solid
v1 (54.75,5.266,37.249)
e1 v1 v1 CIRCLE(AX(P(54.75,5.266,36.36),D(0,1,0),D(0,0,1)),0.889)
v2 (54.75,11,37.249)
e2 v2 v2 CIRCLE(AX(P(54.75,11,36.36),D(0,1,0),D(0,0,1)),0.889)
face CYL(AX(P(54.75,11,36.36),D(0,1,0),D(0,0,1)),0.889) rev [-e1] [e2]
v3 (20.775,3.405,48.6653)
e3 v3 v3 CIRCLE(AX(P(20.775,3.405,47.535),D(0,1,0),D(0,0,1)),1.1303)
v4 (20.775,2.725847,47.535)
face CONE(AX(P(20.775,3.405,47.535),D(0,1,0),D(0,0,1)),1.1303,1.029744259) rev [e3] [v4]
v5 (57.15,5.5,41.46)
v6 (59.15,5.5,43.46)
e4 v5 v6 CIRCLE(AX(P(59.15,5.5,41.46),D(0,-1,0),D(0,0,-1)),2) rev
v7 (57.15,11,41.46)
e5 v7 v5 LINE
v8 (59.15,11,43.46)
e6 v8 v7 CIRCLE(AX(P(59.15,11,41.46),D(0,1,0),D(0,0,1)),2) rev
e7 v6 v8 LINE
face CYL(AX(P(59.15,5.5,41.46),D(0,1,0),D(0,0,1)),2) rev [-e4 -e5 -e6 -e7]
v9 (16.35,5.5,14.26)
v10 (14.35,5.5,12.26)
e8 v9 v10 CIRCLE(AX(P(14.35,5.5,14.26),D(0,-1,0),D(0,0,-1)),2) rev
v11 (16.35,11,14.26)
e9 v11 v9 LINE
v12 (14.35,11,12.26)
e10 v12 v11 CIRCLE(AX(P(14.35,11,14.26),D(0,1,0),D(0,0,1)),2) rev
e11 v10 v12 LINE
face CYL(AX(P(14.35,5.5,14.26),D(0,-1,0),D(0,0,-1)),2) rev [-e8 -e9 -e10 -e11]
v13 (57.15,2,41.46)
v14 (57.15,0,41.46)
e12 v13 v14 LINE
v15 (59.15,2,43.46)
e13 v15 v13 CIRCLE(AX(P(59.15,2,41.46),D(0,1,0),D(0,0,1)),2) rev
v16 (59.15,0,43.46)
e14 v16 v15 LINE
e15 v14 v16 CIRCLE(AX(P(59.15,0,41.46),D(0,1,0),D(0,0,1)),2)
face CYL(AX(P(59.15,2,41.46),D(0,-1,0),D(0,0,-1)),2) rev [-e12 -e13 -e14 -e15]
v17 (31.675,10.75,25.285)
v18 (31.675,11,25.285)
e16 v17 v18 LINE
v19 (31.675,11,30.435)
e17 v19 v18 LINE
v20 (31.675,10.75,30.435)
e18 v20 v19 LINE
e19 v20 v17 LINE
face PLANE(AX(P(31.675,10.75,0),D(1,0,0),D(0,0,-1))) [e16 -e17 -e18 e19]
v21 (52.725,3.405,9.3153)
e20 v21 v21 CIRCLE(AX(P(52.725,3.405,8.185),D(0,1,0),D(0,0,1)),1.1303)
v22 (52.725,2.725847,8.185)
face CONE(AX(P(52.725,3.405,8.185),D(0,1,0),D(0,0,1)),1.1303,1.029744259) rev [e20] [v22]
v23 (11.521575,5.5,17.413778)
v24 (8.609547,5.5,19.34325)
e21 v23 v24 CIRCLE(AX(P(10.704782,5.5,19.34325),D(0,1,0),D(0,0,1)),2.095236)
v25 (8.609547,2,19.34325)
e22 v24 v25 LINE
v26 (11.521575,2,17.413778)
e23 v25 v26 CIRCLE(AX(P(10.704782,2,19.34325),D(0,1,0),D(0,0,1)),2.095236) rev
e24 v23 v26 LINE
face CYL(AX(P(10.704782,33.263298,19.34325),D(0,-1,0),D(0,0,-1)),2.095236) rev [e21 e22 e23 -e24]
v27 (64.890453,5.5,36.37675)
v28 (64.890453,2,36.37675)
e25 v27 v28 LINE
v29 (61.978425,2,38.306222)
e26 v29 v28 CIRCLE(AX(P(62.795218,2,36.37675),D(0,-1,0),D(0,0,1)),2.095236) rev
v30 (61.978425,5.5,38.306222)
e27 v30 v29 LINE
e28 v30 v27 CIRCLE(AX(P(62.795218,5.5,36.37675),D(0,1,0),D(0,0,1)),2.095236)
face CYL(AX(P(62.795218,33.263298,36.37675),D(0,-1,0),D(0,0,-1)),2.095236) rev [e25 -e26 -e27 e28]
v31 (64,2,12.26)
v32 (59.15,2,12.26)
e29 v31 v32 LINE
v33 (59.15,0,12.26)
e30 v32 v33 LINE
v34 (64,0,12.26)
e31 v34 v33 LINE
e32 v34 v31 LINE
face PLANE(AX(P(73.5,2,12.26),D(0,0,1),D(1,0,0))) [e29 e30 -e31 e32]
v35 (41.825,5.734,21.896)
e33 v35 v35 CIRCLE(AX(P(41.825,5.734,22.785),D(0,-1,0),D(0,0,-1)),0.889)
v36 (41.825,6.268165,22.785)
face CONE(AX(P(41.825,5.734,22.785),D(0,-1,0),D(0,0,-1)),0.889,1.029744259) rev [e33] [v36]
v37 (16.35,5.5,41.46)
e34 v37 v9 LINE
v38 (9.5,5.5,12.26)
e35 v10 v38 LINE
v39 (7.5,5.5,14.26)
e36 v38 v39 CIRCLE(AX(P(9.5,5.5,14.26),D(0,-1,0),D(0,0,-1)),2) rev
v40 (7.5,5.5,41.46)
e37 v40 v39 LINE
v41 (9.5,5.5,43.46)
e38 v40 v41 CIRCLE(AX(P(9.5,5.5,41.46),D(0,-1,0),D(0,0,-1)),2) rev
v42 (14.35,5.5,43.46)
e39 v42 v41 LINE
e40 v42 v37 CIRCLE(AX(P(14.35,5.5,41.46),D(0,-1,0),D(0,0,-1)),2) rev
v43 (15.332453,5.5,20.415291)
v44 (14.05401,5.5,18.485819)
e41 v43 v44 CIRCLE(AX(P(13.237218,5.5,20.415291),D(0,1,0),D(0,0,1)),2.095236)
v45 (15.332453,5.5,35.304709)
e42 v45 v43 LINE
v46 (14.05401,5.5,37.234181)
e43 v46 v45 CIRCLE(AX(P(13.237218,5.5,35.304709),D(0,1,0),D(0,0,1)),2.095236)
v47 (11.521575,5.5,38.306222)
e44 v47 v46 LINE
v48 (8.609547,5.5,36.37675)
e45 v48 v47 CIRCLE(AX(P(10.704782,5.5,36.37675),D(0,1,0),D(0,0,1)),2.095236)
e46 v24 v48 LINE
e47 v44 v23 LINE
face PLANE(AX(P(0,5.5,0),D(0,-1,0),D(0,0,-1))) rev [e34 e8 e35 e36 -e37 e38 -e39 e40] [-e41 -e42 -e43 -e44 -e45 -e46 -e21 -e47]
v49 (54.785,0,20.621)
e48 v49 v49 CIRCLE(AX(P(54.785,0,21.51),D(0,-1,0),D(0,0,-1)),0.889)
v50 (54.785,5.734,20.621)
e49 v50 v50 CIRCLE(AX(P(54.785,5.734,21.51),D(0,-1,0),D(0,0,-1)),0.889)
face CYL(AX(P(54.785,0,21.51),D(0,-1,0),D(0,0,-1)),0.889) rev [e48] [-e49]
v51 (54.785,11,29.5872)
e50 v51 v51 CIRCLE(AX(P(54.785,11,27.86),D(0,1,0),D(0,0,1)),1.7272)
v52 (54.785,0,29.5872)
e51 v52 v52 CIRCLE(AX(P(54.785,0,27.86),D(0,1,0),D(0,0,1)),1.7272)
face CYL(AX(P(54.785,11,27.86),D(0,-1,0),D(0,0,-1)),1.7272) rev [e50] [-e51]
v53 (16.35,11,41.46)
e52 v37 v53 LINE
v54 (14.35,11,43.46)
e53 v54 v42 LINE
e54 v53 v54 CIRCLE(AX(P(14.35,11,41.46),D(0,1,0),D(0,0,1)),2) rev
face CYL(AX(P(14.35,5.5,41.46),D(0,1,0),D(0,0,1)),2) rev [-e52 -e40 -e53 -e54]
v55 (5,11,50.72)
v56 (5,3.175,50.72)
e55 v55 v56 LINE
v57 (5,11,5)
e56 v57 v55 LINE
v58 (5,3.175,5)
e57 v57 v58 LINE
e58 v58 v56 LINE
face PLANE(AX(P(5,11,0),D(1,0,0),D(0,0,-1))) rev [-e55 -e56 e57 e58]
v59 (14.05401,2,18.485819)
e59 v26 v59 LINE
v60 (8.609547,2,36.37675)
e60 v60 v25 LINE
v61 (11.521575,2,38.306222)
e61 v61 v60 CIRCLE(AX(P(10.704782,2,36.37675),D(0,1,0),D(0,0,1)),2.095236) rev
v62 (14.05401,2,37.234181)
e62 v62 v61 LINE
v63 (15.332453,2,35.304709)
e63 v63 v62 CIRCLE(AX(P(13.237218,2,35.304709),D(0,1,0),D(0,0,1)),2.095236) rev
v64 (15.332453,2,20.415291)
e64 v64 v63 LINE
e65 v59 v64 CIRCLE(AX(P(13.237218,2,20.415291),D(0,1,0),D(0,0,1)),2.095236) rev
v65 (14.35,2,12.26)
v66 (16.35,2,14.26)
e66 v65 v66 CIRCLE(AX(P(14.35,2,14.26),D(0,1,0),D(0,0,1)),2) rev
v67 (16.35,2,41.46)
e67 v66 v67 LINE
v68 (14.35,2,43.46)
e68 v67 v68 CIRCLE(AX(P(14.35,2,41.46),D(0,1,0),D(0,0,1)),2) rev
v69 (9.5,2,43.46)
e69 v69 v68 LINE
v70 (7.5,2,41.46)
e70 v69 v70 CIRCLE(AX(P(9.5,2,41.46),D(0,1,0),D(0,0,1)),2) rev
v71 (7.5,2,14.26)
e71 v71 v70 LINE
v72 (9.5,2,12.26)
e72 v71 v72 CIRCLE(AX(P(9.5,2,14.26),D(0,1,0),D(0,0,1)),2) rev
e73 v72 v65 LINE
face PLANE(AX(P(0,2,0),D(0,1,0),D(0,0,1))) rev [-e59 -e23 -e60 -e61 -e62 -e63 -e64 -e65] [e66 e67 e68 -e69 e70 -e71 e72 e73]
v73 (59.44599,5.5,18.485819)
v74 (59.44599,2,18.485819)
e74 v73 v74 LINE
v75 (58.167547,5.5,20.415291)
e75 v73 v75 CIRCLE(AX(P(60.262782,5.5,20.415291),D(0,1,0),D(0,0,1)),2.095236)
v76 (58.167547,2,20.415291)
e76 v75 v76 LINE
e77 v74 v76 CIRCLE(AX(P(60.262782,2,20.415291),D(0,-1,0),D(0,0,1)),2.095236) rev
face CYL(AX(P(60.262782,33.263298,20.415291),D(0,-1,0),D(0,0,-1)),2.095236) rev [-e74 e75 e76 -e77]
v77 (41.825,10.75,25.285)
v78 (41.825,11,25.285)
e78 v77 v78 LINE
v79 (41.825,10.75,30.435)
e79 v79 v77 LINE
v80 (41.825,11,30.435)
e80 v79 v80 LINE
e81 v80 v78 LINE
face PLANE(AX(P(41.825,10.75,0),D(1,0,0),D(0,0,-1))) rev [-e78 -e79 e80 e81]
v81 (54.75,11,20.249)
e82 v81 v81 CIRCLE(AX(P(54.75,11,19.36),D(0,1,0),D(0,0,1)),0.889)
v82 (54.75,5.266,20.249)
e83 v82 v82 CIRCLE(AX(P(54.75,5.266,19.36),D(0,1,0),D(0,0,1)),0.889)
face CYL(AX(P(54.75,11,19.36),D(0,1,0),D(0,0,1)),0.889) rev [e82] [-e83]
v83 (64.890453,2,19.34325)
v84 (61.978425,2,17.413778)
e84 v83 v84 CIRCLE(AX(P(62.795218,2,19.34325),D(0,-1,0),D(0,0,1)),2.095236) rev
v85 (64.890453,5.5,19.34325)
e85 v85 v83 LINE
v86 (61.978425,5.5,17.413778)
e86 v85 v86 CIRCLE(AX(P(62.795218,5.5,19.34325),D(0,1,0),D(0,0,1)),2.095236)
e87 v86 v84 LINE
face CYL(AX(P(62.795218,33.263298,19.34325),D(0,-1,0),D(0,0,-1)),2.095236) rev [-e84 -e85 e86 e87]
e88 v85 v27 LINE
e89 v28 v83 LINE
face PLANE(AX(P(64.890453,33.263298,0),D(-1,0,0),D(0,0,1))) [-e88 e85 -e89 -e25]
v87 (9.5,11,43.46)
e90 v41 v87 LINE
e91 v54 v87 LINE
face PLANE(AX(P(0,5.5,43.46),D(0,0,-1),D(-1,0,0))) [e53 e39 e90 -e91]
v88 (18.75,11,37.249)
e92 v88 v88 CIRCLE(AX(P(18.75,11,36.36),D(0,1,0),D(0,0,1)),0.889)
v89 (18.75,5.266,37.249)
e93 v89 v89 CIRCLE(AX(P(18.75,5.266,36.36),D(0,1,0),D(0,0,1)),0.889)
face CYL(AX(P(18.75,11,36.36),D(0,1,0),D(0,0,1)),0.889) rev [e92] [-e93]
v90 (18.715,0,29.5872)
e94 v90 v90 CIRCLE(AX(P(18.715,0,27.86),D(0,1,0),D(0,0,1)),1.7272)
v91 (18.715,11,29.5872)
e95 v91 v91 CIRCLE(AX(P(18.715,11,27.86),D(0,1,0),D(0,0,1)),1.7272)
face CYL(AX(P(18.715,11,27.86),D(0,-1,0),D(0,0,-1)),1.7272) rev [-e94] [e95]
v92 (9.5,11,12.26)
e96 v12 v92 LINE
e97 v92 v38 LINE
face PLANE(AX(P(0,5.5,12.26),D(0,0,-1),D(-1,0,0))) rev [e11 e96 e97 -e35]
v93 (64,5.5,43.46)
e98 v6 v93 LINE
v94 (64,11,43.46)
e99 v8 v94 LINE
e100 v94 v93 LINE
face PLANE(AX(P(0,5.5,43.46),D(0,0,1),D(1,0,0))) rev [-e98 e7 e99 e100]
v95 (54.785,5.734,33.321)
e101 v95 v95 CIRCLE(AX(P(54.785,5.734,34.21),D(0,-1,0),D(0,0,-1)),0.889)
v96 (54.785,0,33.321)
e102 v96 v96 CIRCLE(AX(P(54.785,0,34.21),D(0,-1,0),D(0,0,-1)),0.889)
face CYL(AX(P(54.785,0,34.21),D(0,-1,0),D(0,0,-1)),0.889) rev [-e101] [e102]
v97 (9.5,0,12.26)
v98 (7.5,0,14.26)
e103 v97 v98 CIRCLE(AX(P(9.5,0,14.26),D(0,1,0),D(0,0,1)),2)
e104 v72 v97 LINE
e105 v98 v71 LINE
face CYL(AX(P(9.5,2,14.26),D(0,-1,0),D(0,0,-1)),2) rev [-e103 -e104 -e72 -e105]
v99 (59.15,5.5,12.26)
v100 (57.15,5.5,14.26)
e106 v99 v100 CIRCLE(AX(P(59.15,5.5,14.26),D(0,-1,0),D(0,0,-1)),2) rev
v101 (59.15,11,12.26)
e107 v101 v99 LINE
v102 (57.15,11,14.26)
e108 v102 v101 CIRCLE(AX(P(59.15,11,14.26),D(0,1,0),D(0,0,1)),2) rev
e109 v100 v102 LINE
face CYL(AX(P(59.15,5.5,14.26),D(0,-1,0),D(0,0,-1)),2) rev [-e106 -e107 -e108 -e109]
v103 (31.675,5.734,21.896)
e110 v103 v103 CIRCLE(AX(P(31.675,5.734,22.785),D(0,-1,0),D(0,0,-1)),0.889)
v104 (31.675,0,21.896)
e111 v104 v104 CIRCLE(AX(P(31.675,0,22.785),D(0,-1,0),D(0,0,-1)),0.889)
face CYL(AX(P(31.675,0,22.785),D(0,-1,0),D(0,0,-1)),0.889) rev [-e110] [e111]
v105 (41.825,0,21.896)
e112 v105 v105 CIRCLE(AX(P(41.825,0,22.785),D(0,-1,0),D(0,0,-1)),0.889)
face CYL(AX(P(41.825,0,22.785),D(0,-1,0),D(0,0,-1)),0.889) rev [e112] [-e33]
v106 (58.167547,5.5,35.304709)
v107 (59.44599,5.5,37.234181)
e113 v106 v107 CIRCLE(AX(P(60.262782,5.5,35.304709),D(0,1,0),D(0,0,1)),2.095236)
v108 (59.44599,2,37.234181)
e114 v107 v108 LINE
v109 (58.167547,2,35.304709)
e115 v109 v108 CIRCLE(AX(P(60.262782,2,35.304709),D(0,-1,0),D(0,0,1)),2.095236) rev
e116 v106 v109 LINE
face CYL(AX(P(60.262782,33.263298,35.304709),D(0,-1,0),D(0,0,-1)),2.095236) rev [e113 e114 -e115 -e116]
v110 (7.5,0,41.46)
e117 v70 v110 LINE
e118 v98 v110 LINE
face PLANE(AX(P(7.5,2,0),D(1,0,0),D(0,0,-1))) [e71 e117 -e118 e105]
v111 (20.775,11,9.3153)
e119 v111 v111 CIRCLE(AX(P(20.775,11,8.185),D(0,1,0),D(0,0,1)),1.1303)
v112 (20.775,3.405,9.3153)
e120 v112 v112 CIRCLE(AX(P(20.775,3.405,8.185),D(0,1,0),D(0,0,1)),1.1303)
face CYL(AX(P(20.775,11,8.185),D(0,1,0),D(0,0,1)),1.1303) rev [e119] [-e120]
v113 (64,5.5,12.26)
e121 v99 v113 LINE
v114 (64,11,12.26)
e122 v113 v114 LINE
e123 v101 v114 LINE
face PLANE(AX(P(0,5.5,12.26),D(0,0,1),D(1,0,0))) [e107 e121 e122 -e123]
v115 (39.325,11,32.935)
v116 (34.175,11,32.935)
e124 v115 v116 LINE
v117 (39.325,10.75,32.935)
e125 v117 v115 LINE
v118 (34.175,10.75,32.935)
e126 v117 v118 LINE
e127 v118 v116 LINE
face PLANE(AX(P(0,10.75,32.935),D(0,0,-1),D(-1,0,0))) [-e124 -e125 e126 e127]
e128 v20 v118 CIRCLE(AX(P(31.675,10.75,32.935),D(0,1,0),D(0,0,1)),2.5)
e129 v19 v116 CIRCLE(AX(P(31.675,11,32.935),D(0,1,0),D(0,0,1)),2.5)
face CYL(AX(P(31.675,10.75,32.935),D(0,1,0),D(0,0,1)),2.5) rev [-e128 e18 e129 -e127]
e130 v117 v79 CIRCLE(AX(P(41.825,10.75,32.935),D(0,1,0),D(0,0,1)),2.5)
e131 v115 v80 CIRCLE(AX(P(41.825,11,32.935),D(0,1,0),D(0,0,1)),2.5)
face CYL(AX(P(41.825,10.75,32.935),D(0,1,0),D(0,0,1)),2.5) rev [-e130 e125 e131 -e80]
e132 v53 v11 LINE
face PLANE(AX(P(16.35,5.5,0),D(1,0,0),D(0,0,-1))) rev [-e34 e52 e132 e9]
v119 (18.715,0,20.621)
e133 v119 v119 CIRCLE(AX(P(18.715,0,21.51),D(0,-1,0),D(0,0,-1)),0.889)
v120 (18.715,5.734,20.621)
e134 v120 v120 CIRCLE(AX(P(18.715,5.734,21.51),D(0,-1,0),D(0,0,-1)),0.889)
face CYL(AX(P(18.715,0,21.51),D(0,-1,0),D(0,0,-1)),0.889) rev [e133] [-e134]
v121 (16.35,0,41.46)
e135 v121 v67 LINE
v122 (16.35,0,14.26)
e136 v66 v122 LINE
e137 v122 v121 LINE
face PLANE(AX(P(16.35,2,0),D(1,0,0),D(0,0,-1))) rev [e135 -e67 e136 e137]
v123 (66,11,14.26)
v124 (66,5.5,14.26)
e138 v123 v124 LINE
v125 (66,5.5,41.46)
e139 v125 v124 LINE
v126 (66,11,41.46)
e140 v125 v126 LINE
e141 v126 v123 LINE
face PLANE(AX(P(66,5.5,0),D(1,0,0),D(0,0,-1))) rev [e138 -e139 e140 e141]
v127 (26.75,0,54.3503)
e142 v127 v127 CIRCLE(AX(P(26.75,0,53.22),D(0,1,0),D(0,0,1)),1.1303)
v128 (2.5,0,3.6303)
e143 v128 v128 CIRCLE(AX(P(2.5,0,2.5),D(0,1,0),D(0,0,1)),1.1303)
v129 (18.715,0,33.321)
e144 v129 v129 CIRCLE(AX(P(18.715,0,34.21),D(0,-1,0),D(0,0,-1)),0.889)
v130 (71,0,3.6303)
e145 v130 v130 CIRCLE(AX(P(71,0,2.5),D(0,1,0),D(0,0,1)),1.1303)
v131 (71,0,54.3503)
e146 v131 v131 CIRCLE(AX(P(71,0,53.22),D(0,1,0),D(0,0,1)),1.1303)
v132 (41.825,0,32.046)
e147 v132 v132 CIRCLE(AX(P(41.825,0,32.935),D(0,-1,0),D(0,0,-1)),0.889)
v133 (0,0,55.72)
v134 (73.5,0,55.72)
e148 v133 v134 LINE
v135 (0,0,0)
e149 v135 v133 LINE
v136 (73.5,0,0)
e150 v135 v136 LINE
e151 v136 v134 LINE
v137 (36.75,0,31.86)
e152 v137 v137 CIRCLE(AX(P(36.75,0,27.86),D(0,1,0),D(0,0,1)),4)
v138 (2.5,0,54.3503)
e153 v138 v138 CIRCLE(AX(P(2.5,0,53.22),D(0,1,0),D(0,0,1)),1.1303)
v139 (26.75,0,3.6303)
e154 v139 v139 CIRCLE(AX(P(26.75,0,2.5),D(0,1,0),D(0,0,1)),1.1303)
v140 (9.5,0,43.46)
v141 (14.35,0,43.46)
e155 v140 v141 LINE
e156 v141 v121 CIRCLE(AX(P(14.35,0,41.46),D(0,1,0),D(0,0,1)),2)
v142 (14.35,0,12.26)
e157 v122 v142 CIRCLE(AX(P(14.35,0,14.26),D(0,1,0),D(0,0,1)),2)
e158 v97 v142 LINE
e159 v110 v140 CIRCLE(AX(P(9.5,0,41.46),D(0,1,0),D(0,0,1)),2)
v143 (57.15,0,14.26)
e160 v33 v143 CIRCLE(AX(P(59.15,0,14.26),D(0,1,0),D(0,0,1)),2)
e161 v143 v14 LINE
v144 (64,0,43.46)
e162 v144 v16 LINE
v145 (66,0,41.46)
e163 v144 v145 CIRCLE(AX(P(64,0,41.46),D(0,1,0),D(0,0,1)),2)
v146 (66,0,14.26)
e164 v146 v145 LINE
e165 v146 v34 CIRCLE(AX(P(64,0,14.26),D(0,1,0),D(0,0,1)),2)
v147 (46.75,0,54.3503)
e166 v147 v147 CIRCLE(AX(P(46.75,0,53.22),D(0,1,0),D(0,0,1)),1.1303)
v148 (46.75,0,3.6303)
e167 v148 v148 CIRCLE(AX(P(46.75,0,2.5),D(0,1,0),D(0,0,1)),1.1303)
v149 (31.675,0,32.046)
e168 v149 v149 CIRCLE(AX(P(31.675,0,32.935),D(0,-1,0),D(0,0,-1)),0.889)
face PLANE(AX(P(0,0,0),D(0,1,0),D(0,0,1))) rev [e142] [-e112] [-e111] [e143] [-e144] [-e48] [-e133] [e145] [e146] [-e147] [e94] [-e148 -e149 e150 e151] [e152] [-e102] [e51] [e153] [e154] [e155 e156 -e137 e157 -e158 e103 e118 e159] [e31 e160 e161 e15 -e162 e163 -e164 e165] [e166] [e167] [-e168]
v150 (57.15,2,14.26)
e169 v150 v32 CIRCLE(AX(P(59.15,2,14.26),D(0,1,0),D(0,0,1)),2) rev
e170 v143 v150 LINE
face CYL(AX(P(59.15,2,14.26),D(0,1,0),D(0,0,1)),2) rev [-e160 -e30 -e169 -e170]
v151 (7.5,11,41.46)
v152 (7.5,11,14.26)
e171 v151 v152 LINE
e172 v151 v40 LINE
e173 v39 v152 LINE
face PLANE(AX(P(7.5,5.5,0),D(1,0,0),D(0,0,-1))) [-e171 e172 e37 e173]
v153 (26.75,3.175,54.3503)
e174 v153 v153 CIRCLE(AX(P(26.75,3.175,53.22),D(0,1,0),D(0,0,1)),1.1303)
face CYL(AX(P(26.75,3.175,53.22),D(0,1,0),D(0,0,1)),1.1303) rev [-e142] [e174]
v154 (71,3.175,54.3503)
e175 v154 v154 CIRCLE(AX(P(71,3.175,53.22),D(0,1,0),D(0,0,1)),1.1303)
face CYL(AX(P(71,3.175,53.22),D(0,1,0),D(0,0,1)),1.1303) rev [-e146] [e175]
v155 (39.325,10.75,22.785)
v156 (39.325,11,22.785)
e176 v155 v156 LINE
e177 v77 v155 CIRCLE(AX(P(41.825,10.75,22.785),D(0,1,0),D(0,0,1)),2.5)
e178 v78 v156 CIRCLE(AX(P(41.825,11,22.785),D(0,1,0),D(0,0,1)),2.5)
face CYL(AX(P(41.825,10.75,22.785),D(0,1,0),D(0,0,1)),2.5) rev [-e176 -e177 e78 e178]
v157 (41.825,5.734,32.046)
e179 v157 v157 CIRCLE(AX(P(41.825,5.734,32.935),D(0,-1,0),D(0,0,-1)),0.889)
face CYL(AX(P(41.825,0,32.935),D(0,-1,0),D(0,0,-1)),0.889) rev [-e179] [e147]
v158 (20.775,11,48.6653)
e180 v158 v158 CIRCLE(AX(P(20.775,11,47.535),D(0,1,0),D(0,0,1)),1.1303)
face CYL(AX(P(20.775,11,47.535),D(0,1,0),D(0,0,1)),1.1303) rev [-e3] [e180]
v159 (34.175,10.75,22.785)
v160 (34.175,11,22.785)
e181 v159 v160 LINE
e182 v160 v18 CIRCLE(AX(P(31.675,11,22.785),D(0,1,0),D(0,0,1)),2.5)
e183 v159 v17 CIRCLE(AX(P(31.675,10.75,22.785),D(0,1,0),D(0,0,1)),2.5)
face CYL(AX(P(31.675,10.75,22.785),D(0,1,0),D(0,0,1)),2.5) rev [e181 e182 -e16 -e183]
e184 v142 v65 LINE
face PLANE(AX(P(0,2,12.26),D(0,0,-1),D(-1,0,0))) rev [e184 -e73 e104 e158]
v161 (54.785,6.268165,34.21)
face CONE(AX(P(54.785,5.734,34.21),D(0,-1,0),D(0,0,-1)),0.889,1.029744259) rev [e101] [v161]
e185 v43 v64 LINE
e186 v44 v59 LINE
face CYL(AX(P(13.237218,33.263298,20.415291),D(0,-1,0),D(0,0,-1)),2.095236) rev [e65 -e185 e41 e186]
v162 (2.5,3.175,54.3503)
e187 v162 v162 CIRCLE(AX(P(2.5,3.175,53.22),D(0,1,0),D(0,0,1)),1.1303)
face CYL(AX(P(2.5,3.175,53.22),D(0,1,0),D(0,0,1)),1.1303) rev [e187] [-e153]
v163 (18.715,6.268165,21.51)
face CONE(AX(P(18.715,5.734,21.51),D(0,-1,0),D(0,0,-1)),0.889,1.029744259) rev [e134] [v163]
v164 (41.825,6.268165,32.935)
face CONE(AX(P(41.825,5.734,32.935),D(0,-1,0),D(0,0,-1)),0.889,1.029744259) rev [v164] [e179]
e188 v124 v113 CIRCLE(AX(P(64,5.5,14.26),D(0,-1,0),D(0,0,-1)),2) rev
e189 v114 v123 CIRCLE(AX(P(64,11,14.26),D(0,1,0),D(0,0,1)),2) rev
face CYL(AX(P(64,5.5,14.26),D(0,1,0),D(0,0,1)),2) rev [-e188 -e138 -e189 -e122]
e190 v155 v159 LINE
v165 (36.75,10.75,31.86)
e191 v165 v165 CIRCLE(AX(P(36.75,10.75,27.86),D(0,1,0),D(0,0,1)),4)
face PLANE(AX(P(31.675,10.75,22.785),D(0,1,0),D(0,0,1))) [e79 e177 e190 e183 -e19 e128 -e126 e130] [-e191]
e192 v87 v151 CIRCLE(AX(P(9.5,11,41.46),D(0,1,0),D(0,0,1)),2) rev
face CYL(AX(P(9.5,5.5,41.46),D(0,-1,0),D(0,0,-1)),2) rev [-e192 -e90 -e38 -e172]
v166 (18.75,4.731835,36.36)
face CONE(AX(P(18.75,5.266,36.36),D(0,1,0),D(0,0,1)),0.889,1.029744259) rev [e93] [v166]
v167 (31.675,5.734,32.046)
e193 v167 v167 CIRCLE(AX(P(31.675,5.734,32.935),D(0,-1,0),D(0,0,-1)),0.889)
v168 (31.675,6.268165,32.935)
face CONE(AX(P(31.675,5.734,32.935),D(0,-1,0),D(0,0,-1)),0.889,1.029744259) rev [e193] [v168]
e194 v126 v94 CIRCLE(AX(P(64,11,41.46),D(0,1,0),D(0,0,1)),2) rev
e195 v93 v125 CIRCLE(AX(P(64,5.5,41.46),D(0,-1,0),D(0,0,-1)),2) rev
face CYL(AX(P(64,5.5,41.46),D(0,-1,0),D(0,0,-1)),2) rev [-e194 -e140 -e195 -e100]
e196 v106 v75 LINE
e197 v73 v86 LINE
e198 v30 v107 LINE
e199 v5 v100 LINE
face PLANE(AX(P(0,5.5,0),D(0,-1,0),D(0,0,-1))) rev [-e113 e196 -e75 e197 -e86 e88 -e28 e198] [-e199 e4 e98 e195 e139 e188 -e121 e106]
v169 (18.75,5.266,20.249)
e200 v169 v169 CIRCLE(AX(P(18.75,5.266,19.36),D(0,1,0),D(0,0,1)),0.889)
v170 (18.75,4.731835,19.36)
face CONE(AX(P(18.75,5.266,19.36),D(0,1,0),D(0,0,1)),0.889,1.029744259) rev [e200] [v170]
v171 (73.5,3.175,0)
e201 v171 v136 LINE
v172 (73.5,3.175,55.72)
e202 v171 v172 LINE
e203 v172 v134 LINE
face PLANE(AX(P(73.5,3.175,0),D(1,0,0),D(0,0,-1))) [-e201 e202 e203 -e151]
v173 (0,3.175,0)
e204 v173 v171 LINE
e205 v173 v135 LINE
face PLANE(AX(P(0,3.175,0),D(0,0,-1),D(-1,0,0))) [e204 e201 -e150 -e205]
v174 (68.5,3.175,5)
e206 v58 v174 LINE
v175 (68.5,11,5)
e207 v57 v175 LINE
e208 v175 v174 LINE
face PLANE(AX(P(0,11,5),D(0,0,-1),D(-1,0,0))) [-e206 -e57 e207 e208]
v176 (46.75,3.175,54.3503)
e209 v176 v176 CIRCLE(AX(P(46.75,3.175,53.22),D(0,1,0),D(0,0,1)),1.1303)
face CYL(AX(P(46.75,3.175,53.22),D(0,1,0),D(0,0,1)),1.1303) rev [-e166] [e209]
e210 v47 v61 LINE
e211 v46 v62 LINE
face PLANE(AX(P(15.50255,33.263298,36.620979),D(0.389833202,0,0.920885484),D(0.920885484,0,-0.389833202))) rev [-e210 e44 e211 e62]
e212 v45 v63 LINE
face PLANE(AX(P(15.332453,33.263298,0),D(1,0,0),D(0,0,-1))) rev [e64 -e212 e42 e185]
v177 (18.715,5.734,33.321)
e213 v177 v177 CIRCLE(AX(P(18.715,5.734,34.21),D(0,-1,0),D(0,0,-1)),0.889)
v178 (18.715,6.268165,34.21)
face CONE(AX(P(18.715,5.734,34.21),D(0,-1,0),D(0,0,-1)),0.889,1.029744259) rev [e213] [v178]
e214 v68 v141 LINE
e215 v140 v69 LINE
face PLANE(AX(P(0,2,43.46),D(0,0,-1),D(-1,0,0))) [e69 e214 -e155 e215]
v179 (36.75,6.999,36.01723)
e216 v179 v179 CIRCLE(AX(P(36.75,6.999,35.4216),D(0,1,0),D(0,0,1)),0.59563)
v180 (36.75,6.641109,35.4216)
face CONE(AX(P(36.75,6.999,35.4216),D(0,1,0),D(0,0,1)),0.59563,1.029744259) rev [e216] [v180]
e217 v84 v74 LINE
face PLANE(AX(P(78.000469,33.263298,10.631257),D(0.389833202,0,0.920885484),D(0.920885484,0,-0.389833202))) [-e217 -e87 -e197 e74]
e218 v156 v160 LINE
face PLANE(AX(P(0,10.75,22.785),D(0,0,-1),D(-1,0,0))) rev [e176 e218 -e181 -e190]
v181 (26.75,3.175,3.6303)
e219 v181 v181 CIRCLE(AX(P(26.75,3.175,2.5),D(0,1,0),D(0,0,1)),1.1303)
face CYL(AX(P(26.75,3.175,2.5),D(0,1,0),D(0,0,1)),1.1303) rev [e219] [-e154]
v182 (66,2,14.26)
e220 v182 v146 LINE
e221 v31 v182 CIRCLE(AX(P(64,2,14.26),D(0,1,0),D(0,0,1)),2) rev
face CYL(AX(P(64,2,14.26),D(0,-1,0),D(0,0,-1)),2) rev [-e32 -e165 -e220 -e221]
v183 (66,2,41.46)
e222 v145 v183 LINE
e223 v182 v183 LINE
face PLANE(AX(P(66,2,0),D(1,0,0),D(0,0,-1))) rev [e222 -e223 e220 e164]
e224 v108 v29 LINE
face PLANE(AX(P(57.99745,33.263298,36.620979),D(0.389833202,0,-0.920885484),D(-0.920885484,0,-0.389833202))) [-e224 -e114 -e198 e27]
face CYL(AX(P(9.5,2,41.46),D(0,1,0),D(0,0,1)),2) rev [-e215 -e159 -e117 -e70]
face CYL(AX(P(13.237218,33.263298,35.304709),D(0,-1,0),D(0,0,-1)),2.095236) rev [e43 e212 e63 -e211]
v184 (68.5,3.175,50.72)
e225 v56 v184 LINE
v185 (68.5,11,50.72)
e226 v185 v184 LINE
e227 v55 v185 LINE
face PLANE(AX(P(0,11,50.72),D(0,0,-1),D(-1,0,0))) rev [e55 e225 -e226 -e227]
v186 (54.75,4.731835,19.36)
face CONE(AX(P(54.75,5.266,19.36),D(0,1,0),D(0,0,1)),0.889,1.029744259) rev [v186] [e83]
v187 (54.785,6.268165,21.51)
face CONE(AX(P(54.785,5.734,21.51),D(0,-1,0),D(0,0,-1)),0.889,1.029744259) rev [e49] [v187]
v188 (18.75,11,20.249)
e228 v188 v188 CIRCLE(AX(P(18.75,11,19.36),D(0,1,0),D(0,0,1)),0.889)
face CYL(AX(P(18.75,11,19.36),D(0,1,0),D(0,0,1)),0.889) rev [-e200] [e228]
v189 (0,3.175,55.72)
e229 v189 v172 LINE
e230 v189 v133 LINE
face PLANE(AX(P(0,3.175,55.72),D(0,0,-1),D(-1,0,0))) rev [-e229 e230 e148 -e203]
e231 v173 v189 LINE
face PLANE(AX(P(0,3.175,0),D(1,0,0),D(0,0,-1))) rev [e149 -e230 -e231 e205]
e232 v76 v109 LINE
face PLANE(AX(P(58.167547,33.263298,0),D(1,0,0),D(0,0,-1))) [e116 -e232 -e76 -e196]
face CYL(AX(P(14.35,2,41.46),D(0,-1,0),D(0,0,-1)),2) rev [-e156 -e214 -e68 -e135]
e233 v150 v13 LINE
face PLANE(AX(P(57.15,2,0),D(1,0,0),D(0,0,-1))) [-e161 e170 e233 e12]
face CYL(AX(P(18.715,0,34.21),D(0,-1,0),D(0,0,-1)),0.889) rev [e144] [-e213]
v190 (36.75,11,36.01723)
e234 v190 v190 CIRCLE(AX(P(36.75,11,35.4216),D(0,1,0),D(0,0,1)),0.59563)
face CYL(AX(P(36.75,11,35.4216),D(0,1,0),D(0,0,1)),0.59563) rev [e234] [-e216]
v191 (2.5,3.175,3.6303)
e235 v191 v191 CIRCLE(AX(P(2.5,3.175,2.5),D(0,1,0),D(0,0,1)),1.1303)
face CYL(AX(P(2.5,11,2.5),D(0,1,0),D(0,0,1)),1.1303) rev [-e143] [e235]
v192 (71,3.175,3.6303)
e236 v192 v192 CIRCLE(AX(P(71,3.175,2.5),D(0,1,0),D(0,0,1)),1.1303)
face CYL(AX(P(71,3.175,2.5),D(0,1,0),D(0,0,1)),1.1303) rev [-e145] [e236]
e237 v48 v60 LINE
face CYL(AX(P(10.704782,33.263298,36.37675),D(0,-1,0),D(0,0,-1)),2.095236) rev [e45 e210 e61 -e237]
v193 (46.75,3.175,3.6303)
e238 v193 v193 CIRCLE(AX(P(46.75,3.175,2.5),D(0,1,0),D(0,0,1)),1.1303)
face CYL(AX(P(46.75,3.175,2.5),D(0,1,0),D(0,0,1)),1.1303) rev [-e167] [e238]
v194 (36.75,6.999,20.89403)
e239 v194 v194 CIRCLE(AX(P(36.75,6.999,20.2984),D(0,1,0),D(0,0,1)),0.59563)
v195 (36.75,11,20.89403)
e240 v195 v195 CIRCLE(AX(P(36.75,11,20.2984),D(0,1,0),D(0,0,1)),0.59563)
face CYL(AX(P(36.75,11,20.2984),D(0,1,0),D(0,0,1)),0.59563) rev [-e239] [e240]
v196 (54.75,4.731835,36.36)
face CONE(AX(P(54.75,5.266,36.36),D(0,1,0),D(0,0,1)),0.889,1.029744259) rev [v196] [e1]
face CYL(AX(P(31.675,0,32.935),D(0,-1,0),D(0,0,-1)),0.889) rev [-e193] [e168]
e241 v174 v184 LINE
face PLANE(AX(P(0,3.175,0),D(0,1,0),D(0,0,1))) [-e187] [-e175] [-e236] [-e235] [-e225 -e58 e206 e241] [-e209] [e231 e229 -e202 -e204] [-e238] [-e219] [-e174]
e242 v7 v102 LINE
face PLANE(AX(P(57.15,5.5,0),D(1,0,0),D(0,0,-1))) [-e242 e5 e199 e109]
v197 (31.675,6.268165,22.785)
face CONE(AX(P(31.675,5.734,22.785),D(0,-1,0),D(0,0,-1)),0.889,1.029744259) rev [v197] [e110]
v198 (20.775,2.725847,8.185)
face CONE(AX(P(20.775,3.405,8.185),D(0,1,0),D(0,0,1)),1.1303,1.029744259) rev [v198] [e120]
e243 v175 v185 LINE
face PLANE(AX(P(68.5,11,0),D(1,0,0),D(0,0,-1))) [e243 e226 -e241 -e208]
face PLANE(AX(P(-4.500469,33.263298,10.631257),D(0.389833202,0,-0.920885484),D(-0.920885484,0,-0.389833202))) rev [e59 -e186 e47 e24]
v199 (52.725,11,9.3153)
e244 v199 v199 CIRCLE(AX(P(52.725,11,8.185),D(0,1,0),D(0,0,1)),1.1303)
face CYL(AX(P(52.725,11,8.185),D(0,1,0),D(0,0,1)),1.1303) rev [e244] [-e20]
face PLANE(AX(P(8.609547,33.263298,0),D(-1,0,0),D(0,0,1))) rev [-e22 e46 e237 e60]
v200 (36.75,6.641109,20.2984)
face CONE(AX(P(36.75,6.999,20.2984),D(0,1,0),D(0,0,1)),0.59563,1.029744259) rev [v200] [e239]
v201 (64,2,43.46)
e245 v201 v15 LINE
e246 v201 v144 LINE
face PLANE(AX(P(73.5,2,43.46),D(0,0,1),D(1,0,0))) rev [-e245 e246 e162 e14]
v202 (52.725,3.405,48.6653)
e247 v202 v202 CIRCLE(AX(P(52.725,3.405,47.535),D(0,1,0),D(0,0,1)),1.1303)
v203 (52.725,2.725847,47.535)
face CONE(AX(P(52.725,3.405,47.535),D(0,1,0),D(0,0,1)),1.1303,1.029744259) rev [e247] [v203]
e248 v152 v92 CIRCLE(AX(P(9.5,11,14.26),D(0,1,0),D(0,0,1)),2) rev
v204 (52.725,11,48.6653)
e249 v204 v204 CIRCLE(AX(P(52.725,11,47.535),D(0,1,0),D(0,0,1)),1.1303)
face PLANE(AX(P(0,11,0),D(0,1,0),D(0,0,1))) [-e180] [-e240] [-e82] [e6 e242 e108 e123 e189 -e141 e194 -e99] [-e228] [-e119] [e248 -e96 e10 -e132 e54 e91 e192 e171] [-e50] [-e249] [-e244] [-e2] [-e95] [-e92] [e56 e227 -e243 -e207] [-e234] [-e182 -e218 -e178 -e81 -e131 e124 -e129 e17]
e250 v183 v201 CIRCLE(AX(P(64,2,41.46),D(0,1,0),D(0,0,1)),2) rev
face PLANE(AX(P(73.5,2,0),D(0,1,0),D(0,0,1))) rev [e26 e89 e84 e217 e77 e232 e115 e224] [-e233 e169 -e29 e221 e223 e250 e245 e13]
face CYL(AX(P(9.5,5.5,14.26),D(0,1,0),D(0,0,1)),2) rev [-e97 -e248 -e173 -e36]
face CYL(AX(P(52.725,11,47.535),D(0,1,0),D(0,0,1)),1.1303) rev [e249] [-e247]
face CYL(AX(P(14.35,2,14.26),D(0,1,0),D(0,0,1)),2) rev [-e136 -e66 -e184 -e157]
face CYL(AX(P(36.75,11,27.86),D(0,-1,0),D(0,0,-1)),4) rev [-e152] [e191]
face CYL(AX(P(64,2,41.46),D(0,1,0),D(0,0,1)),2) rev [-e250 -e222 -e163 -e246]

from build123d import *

# Parameters (mm, degrees)
MAIN_SKETCH_W                           = 73.5
MAIN_SKETCH_H                           = 55.72
MAIN_SKETCH_W_2                         = 63.5
MAIN_SKETCH_H_2                         = 45.72
LIP_DEPTH                               = 3.175
MOUNTING_BASE_OUTLINE_W                 = 63.5
MOUNTING_BASE_OUTLINE_H                 = 45.72
MOUNTING_BASE_OUTLINE_R                 = 1.7272
MOUNTING_BASE_OUTLINE_R_2               = 4
MOUNTING_BASE_DEPTH                     = 11
HEATER_CART_4_40_TAPS_D                 = 2.2606
HEATER_CART_4_40_TAPS_DEPTH             = 7.595
HEATER_CART_4_40_TAPS_TIP               = 0.679152758
MAIN_SKETCH_12_W                        = 8.85
MAIN_SKETCH_12_H                        = 31.2
BOTTOM_SQUARE_CUTOUT_DEPTH              = 2
SQUARE_MICRO_D_CUTOUT_START             = 5.5
SQUARE_MICRO_D_CUTOUT_OUTLINE_W         = 8.85
SQUARE_MICRO_D_CUTOUT_OUTLINE_H         = 31.2
SQUARE_MICRO_D_CUTOUT_DEPTH             = 5.5
ROUND_MICRO_D_CUTOUT_REACH              = 94.887
MAIN_SKETCH_7_R                         = 0.285
INTERNAL_CORNER_CUTOUTS_FILLET_R        = 2
CHIP_CLAMP_0_80_TAPS_AT_2_COUNT         = 2
CHIP_CLAMP_0_80_TAPS_AT_2_PITCH         = 15.1232
CHIP_CLAMP_0_80_TAPS_AT_3_COUNT         = 2
CHIP_CLAMP_0_80_TAPS_AT_3_PITCH         = 15.1232
CHIP_POCKET_START                       = 10.75
MAIN_SKETCH_6_R                         = 2.5
MAIN_SKETCH_6_W                         = 10.15
MAIN_SKETCH_6_H                         = 10.15
CHIP_POCKET_DEPTH                       = 0.25
F_2_56_CLOSE_CLEAR_43_0_089_D           = 2.2606
F_2_56_CLOSE_CLEAR_43_0_089_ON_FACE_2_D = 2.2606
F_2_56_CLOSE_CLEAR_43_0_089_ON_FACE_3_D = 2.2606
PCB_2_56_TAPS_D                         = 1.778
PCB_2_56_TAPS_DEPTH                     = 5.734
PCB_2_56_TAPS_TIP                       = 0.53416509
BOTTOM_COVER_2_56_TAPS_D                = 1.778
BOTTOM_COVER_2_56_TAPS_DEPTH            = 5.734
BOTTOM_COVER_2_56_TAPS_TIP              = 0.53416509


# Read off the part's stored shape, not the designer's step: Mounting_Base, Square_Micro_D_Cutout
with BuildPart() as part:
    # Main_Sketch → Lip (new body)
    with BuildSketch(Plane(origin=(0, 0, 0), x_dir=(1, 0, 0), z_dir=(0, 1, 0))):
        with Locations((36.75, -27.86)):
            Rectangle(MAIN_SKETCH_W, MAIN_SKETCH_H)
        with Locations((36.75, -27.86)):
            Rectangle(MAIN_SKETCH_W_2, MAIN_SKETCH_H_2, mode=Mode.SUBTRACT)
    extrude(amount=LIP_DEPTH)

    # Mounting_Base outline → Mounting_Base (add)
    with BuildSketch(Plane(origin=(0, 0, 0), x_dir=(1, 0, 0), z_dir=(0, 1, 0))):
        with Locations((36.75, -27.86)):
            Rectangle(MOUNTING_BASE_OUTLINE_W, MOUNTING_BASE_OUTLINE_H)
        with Locations((18.715, -27.86)):
            Circle(MOUNTING_BASE_OUTLINE_R, mode=Mode.SUBTRACT)
        with Locations((36.75, -27.86)):
            Circle(MOUNTING_BASE_OUTLINE_R_2, mode=Mode.SUBTRACT)
        with Locations((54.785, -27.86)):
            Circle(MOUNTING_BASE_OUTLINE_R, mode=Mode.SUBTRACT)
    extrude(amount=MOUNTING_BASE_DEPTH)

    # Heater_Cart_#4-40_Taps
    with Locations(Plane(origin=(20.775, 11, 8.185), x_dir=(0, 0, 1), z_dir=(0, 1, 0))):
        with Locations((0, 0), (0, 31.95), (39.35, 31.95), (39.35, 0)):
            Hole(HEATER_CART_4_40_TAPS_D / 2, depth=HEATER_CART_4_40_TAPS_DEPTH)
            with Locations((0, 0, -(HEATER_CART_4_40_TAPS_DEPTH + HEATER_CART_4_40_TAPS_TIP / 2))):  # 118° drill point
                Cone(0, HEATER_CART_4_40_TAPS_D / 2, HEATER_CART_4_40_TAPS_TIP, mode=Mode.SUBTRACT)

    # Main_Sketch<12> → Bottom_square_cutout (cut)
    with BuildSketch(Plane(origin=(0, 0, 0), x_dir=(1, 0, 0), z_dir=(0, 1, 0))):
        with Locations((11.925, -27.86)):
            Rectangle(MAIN_SKETCH_12_W, MAIN_SKETCH_12_H)
        with BuildLine():
            ThreePointArc((11.521574965, -38.306222286), (10.496212222, -38.461578951), (9.521946869, -38.106175702))
            ThreePointArc((9.521946869, -38.106175702), (8.851632057, -37.354424217), (8.609546604, -36.37675))
            Line((8.609546604, -36.37675), (8.609546604, -19.34325))
            ThreePointArc((8.609546604, -19.34325), (8.851632057, -18.365575783), (9.521946869, -17.613824298))
            ThreePointArc((9.521946869, -17.613824298), (10.496212222, -17.258421049), (11.521574965, -17.413777714))
            Line((11.521574965, -17.413777714), (14.054010046, -18.48581902))
            ThreePointArc((14.054010046, -18.48581902), (14.983840891, -19.258001292), (15.3324534, -20.415291306))
            Line((15.3324534, -20.415291306), (15.3324534, -35.304708694))
            ThreePointArc((15.3324534, -35.304708694), (14.983840891, -36.461998708), (14.054010046, -37.23418098))
            Line((14.054010046, -37.23418098), (11.521574965, -38.306222286))
        make_face(mode=Mode.SUBTRACT)
    bottom_square_cutout = extrude(amount=BOTTOM_SQUARE_CUTOUT_DEPTH, mode=Mode.SUBTRACT)

    # Square_Micro_D_Cutout outline → Square_Micro_D_Cutout (cut)
    with BuildSketch(Plane(origin=(0, 0, 0), x_dir=(1, 0, 0), z_dir=(0, 1, 0)).offset(SQUARE_MICRO_D_CUTOUT_START)):
        with Locations((11.925, -27.86)):
            Rectangle(SQUARE_MICRO_D_CUTOUT_OUTLINE_W, SQUARE_MICRO_D_CUTOUT_OUTLINE_H)
        with BuildLine():
            ThreePointArc((11.521574965, -38.306222286), (9.547492447, -38.123373348), (8.609546604, -36.37675))
            Line((8.609546604, -36.37675), (8.609546604, -19.34325))
            ThreePointArc((8.609546604, -19.34325), (9.547492447, -17.596626652), (11.521574965, -17.413777714))
            Line((11.521574965, -17.413777714), (14.054010046, -18.48581902))
            ThreePointArc((14.054010046, -18.48581902), (14.983840891, -19.258001291), (15.3324534, -20.415291306))
            Line((15.3324534, -20.415291306), (15.3324534, -35.304708694))
            ThreePointArc((15.3324534, -35.304708694), (14.983840891, -36.461998709), (14.054010046, -37.23418098))
            Line((14.054010046, -37.23418098), (11.521574965, -38.306222286))
        make_face(mode=Mode.SUBTRACT)
    square_micro_d_cutout = extrude(amount=SQUARE_MICRO_D_CUTOUT_DEPTH, mode=Mode.SUBTRACT)

    # Main_Sketch<7> → Round_Micro_D_Cutout (cut, up to next)
    with BuildSketch(Plane(origin=(0, 0, 0), x_dir=(1, 0, 0), z_dir=(0, 1, 0)), mode=Mode.PRIVATE) as round_micro_d_cutout_sk1:
        with BuildLine():
            ThreePointArc((9.521946869, -38.106175702), (8.851632057, -37.354424217), (8.609546604, -36.37675))
            Line((8.609546604, -36.37675), (8.609546604, -19.34325))
            ThreePointArc((8.609546604, -19.34325), (8.851632057, -18.365575783), (9.521946869, -17.613824298))
            ThreePointArc((9.521946869, -17.613824298), (10.496212222, -17.258421049), (11.521574965, -17.413777714))
            Line((11.521574965, -17.413777714), (14.054010046, -18.48581902))
            ThreePointArc((14.054010046, -18.48581902), (14.983840891, -19.258001292), (15.3324534, -20.415291306))
            Line((15.3324534, -20.415291306), (15.3324534, -35.304708694))
            ThreePointArc((15.3324534, -35.304708694), (14.983840891, -36.461998708), (14.054010046, -37.23418098))
            Line((14.054010046, -37.23418098), (11.521574965, -38.306222286))
            ThreePointArc((11.521574965, -38.306222286), (10.496212222, -38.461578951), (9.521946869, -38.106175702))
        make_face()
        with Locations((11.399546604, -27.86)):
            Circle(MAIN_SKETCH_7_R, mode=Mode.SUBTRACT)
    round_micro_d_cutout_tool1 = extrude(round_micro_d_cutout_sk1.sketch, amount=ROUND_MICRO_D_CUTOUT_REACH, mode=Mode.PRIVATE) & part.part
    # Main_Sketch<7> → Round_Micro_D_Cutout (cut, up to next)
    with BuildSketch(Plane(origin=(0, 0, 0), x_dir=(1, 0, 0), z_dir=(0, 1, 0)), mode=Mode.PRIVATE) as round_micro_d_cutout_sk2:
        with Locations((11.399546604, -27.86)):
            Circle(MAIN_SKETCH_7_R)
    round_micro_d_cutout_tool2 = extrude(round_micro_d_cutout_sk2.sketch, amount=ROUND_MICRO_D_CUTOUT_REACH, mode=Mode.PRIVATE) & part.part
    round_micro_d_cutout_1 = round_micro_d_cutout_tool1.solids().sort_by_distance((11.886838, 0, 27.86))[0]
    add(round_micro_d_cutout_1, mode=Mode.SUBTRACT)
    round_micro_d_cutout_2 = round_micro_d_cutout_tool2.solids().sort_by_distance((11.399547, 0, 27.86))[0]
    add(round_micro_d_cutout_2, mode=Mode.SUBTRACT)
    round_micro_d_cutout = round_micro_d_cutout_1 + round_micro_d_cutout_2  # Round_Micro_D_Cutout as one shape, for the pattern or mirror that repeats it

    # MicroD_Mirror: Bottom_square_cutout, Square_Micro_D_Cutout, Round_Micro_D_Cutout across plane
    add(bottom_square_cutout.mirror(Plane.ZY.offset(-36.75)), mode=Mode.SUBTRACT)
    add(square_micro_d_cutout.mirror(Plane.ZY.offset(-36.75)), mode=Mode.SUBTRACT)
    add(round_micro_d_cutout.mirror(Plane.ZY.offset(-36.75)), mode=Mode.SUBTRACT)

    # Internal_Corner_cutouts_fillet
    internal_corner_cutouts_fillet_edges = [part.edges().sort_by_distance(p)[0] for p in [
        (16.35, 8.25, 43.46),
        (7.5, 8.25, 43.46),
        (7.5, 8.25, 12.26),
        (16.35, 8.25, 12.26),
        (57.15, 1, 12.26),
        (57.15, 1, 43.46),
        (66, 1, 43.46),
        (66, 1, 12.26),
        (66, 8.25, 12.26),
        (66, 8.25, 43.46),
        (57.15, 8.25, 43.46),
        (57.15, 8.25, 12.26),
        (16.35, 1, 43.46),
        (16.35, 1, 12.26),
        (7.5, 1, 12.26),
        (7.5, 1, 43.46),
    ]]
    fillet(internal_corner_cutouts_fillet_edges, radius=INTERNAL_CORNER_CUTOUTS_FILLET_R)

    # Sketch3 → Chip_Clamp_#0-80 Taps (revolve, cut)
    with BuildSketch(Plane(origin=(36.75, 11, 35.4216), x_dir=(0, 0, 1), z_dir=(1, 0, 0))):
        Polygon((0, 0), (0, 4.358890611), (0.59563, 4.001), (0.59563, 0), align=None)
    chip_clamp_0_80_taps = revolve(axis=Axis((36.75, 17.35, 35.4216), (0, -1, 0)), mode=Mode.SUBTRACT)

    # Chip_Clamp_#0-80 Taps at 2: Chip_Clamp_#0-80 Taps ×2
    with Locations(*[(0, 0, -i * CHIP_CLAMP_0_80_TAPS_AT_2_PITCH) for i in range(1, CHIP_CLAMP_0_80_TAPS_AT_2_COUNT)]):
        add(chip_clamp_0_80_taps, mode=Mode.SUBTRACT)

    # Chip_Clamp_#0-80 Taps at 3: Chip_Clamp_#0-80 Taps ×2
    with Locations(*[(0, 0, -i * CHIP_CLAMP_0_80_TAPS_AT_3_PITCH) for i in range(1, CHIP_CLAMP_0_80_TAPS_AT_3_COUNT)]):
        add(chip_clamp_0_80_taps, mode=Mode.SUBTRACT)

    # Main_Sketch<6> → Chip_Pocket (cut)
    with BuildSketch(Plane(origin=(0, 0, 0), x_dir=(1, 0, 0), z_dir=(0, 1, 0)).offset(CHIP_POCKET_START)):
        with BuildLine():
            Line((31.675, -25.285), (31.675, -22.785))
            Line((31.675, -22.785), (34.175, -22.785))
            ThreePointArc((34.175, -22.785), (29.907233047, -21.017233047), (31.675, -25.285))
        make_face()
        with BuildLine():
            Line((34.175, -22.785), (31.675, -22.785))
            Line((31.675, -22.785), (31.675, -25.285))
            ThreePointArc((31.675, -25.285), (33.442766953, -24.552766953), (34.175, -22.785))
        make_face()
        with BuildLine():
            ThreePointArc((44.325, -22.785), (41.825, -20.285), (39.325, -22.785))
            Line((39.325, -22.785), (41.825, -22.785))
            Line((41.825, -22.785), (41.825, -25.285))
            ThreePointArc((41.825, -25.285), (43.592766953, -24.552766953), (44.325, -22.785))
        make_face()
        with BuildLine():
            Line((41.825, -22.785), (39.325, -22.785))
            ThreePointArc((39.325, -22.785), (40.057233047, -24.552766953), (41.825, -25.285))
            Line((41.825, -25.285), (41.825, -22.785))
        make_face()
        with BuildLine():
            ThreePointArc((34.175, -32.935), (33.442766953, -31.167233047), (31.675, -30.435))
            Line((31.675, -30.435), (31.675, -32.935))
            Line((31.675, -32.935), (34.175, -32.935))
        make_face()
        with BuildLine():
            Line((31.675, -32.935), (31.675, -30.435))
            ThreePointArc((31.675, -30.435), (29.907233047, -34.702766953), (34.175, -32.935))
            Line((34.175, -32.935), (31.675, -32.935))
        make_face()
        with BuildLine():
            ThreePointArc((44.325, -32.935), (43.592766953, -31.167233047), (41.825, -30.435))
            Line((41.825, -30.435), (41.825, -32.935))
            Line((41.825, -32.935), (39.325, -32.935))
            ThreePointArc((39.325, -32.935), (41.825, -35.435), (44.325, -32.935))
        make_face()
        with BuildLine():
            Line((41.825, -32.935), (41.825, -30.435))
            ThreePointArc((41.825, -30.435), (40.057233047, -31.167233047), (39.325, -32.935))
            Line((39.325, -32.935), (41.825, -32.935))
        make_face()
        with Locations((41.825, -32.935)):
            Circle(MAIN_SKETCH_6_R)
        with Locations((41.825, -22.785)):
            Circle(MAIN_SKETCH_6_R)
        with Locations((31.675, -22.785)):
            Circle(MAIN_SKETCH_6_R)
        with Locations((31.675, -32.935)):
            Circle(MAIN_SKETCH_6_R)
        with Locations((36.75, -27.86)):
            Rectangle(MAIN_SKETCH_6_W, MAIN_SKETCH_6_H)
    extrude(amount=CHIP_POCKET_DEPTH, mode=Mode.SUBTRACT)

    # 2-56_Close_Clear#43 (0.089) (through all)
    with Locations(Plane(origin=(2.5, 11, 2.5), x_dir=(0, 0, 1), z_dir=(0, 1, 0))):
        with Locations((0, 0)):
            Hole(F_2_56_CLOSE_CLEAR_43_0_089_D / 2)

    # 2-56_Close_Clear#43 (0.089) on face 2 (through all)
    with Locations(Plane(origin=(26.75, 0, 53.22), x_dir=(0, 0, -1), z_dir=(0, -1, 0))):
        with Locations((0, 0), (50.72, 44.25), (50.72, 20), (0, 44.25), (0, 20), (0, -24.25), (50.72, 0)):
            Hole(F_2_56_CLOSE_CLEAR_43_0_089_ON_FACE_2_D / 2)

    # 2-56_Close_Clear#43 (0.089) on face 3 (through all)
    with Locations(Plane(origin=(26.75, 3.175, 53.22), x_dir=(0, 0, 1), z_dir=(0, 1, 0))):
        with Locations((0, 0), (-50.72, 44.25), (-50.72, 20), (0, 44.25), (0, 20), (0, -24.25), (-50.72, 0)):
            Hole(F_2_56_CLOSE_CLEAR_43_0_089_ON_FACE_3_D / 2)

    # PCB #2-56 Taps
    with Locations(Plane(origin=(18.75, 11, 19.36), x_dir=(0, 0, 1), z_dir=(0, 1, 0))):
        with Locations((0, 0), (17, 0), (0, 36), (17, 36)):
            Hole(PCB_2_56_TAPS_D / 2, depth=PCB_2_56_TAPS_DEPTH)
            with Locations((0, 0, -(PCB_2_56_TAPS_DEPTH + PCB_2_56_TAPS_TIP / 2))):  # 118° drill point
                Cone(0, PCB_2_56_TAPS_D / 2, PCB_2_56_TAPS_TIP, mode=Mode.SUBTRACT)

    # Bottom_Cover#2-56 Taps
    with Locations(Plane(origin=(41.825, 0, 22.785), x_dir=(0, 0, -1), z_dir=(0, -1, 0))):
        with Locations((0, 0), (0, -10.15), (-10.15, -10.15), (-10.15, 0), (1.275, 12.96), (-11.425, 12.96), (-11.425, -23.11), (1.275, -23.11)):
            Hole(BOTTOM_COVER_2_56_TAPS_D / 2, depth=BOTTOM_COVER_2_56_TAPS_DEPTH)
            with Locations((0, 0, -(BOTTOM_COVER_2_56_TAPS_DEPTH + BOTTOM_COVER_2_56_TAPS_TIP / 2))):  # 118° drill point
                Cone(0, BOTTOM_COVER_2_56_TAPS_D / 2, BOTTOM_COVER_2_56_TAPS_TIP, mode=Mode.SUBTRACT)


solid = part.part
